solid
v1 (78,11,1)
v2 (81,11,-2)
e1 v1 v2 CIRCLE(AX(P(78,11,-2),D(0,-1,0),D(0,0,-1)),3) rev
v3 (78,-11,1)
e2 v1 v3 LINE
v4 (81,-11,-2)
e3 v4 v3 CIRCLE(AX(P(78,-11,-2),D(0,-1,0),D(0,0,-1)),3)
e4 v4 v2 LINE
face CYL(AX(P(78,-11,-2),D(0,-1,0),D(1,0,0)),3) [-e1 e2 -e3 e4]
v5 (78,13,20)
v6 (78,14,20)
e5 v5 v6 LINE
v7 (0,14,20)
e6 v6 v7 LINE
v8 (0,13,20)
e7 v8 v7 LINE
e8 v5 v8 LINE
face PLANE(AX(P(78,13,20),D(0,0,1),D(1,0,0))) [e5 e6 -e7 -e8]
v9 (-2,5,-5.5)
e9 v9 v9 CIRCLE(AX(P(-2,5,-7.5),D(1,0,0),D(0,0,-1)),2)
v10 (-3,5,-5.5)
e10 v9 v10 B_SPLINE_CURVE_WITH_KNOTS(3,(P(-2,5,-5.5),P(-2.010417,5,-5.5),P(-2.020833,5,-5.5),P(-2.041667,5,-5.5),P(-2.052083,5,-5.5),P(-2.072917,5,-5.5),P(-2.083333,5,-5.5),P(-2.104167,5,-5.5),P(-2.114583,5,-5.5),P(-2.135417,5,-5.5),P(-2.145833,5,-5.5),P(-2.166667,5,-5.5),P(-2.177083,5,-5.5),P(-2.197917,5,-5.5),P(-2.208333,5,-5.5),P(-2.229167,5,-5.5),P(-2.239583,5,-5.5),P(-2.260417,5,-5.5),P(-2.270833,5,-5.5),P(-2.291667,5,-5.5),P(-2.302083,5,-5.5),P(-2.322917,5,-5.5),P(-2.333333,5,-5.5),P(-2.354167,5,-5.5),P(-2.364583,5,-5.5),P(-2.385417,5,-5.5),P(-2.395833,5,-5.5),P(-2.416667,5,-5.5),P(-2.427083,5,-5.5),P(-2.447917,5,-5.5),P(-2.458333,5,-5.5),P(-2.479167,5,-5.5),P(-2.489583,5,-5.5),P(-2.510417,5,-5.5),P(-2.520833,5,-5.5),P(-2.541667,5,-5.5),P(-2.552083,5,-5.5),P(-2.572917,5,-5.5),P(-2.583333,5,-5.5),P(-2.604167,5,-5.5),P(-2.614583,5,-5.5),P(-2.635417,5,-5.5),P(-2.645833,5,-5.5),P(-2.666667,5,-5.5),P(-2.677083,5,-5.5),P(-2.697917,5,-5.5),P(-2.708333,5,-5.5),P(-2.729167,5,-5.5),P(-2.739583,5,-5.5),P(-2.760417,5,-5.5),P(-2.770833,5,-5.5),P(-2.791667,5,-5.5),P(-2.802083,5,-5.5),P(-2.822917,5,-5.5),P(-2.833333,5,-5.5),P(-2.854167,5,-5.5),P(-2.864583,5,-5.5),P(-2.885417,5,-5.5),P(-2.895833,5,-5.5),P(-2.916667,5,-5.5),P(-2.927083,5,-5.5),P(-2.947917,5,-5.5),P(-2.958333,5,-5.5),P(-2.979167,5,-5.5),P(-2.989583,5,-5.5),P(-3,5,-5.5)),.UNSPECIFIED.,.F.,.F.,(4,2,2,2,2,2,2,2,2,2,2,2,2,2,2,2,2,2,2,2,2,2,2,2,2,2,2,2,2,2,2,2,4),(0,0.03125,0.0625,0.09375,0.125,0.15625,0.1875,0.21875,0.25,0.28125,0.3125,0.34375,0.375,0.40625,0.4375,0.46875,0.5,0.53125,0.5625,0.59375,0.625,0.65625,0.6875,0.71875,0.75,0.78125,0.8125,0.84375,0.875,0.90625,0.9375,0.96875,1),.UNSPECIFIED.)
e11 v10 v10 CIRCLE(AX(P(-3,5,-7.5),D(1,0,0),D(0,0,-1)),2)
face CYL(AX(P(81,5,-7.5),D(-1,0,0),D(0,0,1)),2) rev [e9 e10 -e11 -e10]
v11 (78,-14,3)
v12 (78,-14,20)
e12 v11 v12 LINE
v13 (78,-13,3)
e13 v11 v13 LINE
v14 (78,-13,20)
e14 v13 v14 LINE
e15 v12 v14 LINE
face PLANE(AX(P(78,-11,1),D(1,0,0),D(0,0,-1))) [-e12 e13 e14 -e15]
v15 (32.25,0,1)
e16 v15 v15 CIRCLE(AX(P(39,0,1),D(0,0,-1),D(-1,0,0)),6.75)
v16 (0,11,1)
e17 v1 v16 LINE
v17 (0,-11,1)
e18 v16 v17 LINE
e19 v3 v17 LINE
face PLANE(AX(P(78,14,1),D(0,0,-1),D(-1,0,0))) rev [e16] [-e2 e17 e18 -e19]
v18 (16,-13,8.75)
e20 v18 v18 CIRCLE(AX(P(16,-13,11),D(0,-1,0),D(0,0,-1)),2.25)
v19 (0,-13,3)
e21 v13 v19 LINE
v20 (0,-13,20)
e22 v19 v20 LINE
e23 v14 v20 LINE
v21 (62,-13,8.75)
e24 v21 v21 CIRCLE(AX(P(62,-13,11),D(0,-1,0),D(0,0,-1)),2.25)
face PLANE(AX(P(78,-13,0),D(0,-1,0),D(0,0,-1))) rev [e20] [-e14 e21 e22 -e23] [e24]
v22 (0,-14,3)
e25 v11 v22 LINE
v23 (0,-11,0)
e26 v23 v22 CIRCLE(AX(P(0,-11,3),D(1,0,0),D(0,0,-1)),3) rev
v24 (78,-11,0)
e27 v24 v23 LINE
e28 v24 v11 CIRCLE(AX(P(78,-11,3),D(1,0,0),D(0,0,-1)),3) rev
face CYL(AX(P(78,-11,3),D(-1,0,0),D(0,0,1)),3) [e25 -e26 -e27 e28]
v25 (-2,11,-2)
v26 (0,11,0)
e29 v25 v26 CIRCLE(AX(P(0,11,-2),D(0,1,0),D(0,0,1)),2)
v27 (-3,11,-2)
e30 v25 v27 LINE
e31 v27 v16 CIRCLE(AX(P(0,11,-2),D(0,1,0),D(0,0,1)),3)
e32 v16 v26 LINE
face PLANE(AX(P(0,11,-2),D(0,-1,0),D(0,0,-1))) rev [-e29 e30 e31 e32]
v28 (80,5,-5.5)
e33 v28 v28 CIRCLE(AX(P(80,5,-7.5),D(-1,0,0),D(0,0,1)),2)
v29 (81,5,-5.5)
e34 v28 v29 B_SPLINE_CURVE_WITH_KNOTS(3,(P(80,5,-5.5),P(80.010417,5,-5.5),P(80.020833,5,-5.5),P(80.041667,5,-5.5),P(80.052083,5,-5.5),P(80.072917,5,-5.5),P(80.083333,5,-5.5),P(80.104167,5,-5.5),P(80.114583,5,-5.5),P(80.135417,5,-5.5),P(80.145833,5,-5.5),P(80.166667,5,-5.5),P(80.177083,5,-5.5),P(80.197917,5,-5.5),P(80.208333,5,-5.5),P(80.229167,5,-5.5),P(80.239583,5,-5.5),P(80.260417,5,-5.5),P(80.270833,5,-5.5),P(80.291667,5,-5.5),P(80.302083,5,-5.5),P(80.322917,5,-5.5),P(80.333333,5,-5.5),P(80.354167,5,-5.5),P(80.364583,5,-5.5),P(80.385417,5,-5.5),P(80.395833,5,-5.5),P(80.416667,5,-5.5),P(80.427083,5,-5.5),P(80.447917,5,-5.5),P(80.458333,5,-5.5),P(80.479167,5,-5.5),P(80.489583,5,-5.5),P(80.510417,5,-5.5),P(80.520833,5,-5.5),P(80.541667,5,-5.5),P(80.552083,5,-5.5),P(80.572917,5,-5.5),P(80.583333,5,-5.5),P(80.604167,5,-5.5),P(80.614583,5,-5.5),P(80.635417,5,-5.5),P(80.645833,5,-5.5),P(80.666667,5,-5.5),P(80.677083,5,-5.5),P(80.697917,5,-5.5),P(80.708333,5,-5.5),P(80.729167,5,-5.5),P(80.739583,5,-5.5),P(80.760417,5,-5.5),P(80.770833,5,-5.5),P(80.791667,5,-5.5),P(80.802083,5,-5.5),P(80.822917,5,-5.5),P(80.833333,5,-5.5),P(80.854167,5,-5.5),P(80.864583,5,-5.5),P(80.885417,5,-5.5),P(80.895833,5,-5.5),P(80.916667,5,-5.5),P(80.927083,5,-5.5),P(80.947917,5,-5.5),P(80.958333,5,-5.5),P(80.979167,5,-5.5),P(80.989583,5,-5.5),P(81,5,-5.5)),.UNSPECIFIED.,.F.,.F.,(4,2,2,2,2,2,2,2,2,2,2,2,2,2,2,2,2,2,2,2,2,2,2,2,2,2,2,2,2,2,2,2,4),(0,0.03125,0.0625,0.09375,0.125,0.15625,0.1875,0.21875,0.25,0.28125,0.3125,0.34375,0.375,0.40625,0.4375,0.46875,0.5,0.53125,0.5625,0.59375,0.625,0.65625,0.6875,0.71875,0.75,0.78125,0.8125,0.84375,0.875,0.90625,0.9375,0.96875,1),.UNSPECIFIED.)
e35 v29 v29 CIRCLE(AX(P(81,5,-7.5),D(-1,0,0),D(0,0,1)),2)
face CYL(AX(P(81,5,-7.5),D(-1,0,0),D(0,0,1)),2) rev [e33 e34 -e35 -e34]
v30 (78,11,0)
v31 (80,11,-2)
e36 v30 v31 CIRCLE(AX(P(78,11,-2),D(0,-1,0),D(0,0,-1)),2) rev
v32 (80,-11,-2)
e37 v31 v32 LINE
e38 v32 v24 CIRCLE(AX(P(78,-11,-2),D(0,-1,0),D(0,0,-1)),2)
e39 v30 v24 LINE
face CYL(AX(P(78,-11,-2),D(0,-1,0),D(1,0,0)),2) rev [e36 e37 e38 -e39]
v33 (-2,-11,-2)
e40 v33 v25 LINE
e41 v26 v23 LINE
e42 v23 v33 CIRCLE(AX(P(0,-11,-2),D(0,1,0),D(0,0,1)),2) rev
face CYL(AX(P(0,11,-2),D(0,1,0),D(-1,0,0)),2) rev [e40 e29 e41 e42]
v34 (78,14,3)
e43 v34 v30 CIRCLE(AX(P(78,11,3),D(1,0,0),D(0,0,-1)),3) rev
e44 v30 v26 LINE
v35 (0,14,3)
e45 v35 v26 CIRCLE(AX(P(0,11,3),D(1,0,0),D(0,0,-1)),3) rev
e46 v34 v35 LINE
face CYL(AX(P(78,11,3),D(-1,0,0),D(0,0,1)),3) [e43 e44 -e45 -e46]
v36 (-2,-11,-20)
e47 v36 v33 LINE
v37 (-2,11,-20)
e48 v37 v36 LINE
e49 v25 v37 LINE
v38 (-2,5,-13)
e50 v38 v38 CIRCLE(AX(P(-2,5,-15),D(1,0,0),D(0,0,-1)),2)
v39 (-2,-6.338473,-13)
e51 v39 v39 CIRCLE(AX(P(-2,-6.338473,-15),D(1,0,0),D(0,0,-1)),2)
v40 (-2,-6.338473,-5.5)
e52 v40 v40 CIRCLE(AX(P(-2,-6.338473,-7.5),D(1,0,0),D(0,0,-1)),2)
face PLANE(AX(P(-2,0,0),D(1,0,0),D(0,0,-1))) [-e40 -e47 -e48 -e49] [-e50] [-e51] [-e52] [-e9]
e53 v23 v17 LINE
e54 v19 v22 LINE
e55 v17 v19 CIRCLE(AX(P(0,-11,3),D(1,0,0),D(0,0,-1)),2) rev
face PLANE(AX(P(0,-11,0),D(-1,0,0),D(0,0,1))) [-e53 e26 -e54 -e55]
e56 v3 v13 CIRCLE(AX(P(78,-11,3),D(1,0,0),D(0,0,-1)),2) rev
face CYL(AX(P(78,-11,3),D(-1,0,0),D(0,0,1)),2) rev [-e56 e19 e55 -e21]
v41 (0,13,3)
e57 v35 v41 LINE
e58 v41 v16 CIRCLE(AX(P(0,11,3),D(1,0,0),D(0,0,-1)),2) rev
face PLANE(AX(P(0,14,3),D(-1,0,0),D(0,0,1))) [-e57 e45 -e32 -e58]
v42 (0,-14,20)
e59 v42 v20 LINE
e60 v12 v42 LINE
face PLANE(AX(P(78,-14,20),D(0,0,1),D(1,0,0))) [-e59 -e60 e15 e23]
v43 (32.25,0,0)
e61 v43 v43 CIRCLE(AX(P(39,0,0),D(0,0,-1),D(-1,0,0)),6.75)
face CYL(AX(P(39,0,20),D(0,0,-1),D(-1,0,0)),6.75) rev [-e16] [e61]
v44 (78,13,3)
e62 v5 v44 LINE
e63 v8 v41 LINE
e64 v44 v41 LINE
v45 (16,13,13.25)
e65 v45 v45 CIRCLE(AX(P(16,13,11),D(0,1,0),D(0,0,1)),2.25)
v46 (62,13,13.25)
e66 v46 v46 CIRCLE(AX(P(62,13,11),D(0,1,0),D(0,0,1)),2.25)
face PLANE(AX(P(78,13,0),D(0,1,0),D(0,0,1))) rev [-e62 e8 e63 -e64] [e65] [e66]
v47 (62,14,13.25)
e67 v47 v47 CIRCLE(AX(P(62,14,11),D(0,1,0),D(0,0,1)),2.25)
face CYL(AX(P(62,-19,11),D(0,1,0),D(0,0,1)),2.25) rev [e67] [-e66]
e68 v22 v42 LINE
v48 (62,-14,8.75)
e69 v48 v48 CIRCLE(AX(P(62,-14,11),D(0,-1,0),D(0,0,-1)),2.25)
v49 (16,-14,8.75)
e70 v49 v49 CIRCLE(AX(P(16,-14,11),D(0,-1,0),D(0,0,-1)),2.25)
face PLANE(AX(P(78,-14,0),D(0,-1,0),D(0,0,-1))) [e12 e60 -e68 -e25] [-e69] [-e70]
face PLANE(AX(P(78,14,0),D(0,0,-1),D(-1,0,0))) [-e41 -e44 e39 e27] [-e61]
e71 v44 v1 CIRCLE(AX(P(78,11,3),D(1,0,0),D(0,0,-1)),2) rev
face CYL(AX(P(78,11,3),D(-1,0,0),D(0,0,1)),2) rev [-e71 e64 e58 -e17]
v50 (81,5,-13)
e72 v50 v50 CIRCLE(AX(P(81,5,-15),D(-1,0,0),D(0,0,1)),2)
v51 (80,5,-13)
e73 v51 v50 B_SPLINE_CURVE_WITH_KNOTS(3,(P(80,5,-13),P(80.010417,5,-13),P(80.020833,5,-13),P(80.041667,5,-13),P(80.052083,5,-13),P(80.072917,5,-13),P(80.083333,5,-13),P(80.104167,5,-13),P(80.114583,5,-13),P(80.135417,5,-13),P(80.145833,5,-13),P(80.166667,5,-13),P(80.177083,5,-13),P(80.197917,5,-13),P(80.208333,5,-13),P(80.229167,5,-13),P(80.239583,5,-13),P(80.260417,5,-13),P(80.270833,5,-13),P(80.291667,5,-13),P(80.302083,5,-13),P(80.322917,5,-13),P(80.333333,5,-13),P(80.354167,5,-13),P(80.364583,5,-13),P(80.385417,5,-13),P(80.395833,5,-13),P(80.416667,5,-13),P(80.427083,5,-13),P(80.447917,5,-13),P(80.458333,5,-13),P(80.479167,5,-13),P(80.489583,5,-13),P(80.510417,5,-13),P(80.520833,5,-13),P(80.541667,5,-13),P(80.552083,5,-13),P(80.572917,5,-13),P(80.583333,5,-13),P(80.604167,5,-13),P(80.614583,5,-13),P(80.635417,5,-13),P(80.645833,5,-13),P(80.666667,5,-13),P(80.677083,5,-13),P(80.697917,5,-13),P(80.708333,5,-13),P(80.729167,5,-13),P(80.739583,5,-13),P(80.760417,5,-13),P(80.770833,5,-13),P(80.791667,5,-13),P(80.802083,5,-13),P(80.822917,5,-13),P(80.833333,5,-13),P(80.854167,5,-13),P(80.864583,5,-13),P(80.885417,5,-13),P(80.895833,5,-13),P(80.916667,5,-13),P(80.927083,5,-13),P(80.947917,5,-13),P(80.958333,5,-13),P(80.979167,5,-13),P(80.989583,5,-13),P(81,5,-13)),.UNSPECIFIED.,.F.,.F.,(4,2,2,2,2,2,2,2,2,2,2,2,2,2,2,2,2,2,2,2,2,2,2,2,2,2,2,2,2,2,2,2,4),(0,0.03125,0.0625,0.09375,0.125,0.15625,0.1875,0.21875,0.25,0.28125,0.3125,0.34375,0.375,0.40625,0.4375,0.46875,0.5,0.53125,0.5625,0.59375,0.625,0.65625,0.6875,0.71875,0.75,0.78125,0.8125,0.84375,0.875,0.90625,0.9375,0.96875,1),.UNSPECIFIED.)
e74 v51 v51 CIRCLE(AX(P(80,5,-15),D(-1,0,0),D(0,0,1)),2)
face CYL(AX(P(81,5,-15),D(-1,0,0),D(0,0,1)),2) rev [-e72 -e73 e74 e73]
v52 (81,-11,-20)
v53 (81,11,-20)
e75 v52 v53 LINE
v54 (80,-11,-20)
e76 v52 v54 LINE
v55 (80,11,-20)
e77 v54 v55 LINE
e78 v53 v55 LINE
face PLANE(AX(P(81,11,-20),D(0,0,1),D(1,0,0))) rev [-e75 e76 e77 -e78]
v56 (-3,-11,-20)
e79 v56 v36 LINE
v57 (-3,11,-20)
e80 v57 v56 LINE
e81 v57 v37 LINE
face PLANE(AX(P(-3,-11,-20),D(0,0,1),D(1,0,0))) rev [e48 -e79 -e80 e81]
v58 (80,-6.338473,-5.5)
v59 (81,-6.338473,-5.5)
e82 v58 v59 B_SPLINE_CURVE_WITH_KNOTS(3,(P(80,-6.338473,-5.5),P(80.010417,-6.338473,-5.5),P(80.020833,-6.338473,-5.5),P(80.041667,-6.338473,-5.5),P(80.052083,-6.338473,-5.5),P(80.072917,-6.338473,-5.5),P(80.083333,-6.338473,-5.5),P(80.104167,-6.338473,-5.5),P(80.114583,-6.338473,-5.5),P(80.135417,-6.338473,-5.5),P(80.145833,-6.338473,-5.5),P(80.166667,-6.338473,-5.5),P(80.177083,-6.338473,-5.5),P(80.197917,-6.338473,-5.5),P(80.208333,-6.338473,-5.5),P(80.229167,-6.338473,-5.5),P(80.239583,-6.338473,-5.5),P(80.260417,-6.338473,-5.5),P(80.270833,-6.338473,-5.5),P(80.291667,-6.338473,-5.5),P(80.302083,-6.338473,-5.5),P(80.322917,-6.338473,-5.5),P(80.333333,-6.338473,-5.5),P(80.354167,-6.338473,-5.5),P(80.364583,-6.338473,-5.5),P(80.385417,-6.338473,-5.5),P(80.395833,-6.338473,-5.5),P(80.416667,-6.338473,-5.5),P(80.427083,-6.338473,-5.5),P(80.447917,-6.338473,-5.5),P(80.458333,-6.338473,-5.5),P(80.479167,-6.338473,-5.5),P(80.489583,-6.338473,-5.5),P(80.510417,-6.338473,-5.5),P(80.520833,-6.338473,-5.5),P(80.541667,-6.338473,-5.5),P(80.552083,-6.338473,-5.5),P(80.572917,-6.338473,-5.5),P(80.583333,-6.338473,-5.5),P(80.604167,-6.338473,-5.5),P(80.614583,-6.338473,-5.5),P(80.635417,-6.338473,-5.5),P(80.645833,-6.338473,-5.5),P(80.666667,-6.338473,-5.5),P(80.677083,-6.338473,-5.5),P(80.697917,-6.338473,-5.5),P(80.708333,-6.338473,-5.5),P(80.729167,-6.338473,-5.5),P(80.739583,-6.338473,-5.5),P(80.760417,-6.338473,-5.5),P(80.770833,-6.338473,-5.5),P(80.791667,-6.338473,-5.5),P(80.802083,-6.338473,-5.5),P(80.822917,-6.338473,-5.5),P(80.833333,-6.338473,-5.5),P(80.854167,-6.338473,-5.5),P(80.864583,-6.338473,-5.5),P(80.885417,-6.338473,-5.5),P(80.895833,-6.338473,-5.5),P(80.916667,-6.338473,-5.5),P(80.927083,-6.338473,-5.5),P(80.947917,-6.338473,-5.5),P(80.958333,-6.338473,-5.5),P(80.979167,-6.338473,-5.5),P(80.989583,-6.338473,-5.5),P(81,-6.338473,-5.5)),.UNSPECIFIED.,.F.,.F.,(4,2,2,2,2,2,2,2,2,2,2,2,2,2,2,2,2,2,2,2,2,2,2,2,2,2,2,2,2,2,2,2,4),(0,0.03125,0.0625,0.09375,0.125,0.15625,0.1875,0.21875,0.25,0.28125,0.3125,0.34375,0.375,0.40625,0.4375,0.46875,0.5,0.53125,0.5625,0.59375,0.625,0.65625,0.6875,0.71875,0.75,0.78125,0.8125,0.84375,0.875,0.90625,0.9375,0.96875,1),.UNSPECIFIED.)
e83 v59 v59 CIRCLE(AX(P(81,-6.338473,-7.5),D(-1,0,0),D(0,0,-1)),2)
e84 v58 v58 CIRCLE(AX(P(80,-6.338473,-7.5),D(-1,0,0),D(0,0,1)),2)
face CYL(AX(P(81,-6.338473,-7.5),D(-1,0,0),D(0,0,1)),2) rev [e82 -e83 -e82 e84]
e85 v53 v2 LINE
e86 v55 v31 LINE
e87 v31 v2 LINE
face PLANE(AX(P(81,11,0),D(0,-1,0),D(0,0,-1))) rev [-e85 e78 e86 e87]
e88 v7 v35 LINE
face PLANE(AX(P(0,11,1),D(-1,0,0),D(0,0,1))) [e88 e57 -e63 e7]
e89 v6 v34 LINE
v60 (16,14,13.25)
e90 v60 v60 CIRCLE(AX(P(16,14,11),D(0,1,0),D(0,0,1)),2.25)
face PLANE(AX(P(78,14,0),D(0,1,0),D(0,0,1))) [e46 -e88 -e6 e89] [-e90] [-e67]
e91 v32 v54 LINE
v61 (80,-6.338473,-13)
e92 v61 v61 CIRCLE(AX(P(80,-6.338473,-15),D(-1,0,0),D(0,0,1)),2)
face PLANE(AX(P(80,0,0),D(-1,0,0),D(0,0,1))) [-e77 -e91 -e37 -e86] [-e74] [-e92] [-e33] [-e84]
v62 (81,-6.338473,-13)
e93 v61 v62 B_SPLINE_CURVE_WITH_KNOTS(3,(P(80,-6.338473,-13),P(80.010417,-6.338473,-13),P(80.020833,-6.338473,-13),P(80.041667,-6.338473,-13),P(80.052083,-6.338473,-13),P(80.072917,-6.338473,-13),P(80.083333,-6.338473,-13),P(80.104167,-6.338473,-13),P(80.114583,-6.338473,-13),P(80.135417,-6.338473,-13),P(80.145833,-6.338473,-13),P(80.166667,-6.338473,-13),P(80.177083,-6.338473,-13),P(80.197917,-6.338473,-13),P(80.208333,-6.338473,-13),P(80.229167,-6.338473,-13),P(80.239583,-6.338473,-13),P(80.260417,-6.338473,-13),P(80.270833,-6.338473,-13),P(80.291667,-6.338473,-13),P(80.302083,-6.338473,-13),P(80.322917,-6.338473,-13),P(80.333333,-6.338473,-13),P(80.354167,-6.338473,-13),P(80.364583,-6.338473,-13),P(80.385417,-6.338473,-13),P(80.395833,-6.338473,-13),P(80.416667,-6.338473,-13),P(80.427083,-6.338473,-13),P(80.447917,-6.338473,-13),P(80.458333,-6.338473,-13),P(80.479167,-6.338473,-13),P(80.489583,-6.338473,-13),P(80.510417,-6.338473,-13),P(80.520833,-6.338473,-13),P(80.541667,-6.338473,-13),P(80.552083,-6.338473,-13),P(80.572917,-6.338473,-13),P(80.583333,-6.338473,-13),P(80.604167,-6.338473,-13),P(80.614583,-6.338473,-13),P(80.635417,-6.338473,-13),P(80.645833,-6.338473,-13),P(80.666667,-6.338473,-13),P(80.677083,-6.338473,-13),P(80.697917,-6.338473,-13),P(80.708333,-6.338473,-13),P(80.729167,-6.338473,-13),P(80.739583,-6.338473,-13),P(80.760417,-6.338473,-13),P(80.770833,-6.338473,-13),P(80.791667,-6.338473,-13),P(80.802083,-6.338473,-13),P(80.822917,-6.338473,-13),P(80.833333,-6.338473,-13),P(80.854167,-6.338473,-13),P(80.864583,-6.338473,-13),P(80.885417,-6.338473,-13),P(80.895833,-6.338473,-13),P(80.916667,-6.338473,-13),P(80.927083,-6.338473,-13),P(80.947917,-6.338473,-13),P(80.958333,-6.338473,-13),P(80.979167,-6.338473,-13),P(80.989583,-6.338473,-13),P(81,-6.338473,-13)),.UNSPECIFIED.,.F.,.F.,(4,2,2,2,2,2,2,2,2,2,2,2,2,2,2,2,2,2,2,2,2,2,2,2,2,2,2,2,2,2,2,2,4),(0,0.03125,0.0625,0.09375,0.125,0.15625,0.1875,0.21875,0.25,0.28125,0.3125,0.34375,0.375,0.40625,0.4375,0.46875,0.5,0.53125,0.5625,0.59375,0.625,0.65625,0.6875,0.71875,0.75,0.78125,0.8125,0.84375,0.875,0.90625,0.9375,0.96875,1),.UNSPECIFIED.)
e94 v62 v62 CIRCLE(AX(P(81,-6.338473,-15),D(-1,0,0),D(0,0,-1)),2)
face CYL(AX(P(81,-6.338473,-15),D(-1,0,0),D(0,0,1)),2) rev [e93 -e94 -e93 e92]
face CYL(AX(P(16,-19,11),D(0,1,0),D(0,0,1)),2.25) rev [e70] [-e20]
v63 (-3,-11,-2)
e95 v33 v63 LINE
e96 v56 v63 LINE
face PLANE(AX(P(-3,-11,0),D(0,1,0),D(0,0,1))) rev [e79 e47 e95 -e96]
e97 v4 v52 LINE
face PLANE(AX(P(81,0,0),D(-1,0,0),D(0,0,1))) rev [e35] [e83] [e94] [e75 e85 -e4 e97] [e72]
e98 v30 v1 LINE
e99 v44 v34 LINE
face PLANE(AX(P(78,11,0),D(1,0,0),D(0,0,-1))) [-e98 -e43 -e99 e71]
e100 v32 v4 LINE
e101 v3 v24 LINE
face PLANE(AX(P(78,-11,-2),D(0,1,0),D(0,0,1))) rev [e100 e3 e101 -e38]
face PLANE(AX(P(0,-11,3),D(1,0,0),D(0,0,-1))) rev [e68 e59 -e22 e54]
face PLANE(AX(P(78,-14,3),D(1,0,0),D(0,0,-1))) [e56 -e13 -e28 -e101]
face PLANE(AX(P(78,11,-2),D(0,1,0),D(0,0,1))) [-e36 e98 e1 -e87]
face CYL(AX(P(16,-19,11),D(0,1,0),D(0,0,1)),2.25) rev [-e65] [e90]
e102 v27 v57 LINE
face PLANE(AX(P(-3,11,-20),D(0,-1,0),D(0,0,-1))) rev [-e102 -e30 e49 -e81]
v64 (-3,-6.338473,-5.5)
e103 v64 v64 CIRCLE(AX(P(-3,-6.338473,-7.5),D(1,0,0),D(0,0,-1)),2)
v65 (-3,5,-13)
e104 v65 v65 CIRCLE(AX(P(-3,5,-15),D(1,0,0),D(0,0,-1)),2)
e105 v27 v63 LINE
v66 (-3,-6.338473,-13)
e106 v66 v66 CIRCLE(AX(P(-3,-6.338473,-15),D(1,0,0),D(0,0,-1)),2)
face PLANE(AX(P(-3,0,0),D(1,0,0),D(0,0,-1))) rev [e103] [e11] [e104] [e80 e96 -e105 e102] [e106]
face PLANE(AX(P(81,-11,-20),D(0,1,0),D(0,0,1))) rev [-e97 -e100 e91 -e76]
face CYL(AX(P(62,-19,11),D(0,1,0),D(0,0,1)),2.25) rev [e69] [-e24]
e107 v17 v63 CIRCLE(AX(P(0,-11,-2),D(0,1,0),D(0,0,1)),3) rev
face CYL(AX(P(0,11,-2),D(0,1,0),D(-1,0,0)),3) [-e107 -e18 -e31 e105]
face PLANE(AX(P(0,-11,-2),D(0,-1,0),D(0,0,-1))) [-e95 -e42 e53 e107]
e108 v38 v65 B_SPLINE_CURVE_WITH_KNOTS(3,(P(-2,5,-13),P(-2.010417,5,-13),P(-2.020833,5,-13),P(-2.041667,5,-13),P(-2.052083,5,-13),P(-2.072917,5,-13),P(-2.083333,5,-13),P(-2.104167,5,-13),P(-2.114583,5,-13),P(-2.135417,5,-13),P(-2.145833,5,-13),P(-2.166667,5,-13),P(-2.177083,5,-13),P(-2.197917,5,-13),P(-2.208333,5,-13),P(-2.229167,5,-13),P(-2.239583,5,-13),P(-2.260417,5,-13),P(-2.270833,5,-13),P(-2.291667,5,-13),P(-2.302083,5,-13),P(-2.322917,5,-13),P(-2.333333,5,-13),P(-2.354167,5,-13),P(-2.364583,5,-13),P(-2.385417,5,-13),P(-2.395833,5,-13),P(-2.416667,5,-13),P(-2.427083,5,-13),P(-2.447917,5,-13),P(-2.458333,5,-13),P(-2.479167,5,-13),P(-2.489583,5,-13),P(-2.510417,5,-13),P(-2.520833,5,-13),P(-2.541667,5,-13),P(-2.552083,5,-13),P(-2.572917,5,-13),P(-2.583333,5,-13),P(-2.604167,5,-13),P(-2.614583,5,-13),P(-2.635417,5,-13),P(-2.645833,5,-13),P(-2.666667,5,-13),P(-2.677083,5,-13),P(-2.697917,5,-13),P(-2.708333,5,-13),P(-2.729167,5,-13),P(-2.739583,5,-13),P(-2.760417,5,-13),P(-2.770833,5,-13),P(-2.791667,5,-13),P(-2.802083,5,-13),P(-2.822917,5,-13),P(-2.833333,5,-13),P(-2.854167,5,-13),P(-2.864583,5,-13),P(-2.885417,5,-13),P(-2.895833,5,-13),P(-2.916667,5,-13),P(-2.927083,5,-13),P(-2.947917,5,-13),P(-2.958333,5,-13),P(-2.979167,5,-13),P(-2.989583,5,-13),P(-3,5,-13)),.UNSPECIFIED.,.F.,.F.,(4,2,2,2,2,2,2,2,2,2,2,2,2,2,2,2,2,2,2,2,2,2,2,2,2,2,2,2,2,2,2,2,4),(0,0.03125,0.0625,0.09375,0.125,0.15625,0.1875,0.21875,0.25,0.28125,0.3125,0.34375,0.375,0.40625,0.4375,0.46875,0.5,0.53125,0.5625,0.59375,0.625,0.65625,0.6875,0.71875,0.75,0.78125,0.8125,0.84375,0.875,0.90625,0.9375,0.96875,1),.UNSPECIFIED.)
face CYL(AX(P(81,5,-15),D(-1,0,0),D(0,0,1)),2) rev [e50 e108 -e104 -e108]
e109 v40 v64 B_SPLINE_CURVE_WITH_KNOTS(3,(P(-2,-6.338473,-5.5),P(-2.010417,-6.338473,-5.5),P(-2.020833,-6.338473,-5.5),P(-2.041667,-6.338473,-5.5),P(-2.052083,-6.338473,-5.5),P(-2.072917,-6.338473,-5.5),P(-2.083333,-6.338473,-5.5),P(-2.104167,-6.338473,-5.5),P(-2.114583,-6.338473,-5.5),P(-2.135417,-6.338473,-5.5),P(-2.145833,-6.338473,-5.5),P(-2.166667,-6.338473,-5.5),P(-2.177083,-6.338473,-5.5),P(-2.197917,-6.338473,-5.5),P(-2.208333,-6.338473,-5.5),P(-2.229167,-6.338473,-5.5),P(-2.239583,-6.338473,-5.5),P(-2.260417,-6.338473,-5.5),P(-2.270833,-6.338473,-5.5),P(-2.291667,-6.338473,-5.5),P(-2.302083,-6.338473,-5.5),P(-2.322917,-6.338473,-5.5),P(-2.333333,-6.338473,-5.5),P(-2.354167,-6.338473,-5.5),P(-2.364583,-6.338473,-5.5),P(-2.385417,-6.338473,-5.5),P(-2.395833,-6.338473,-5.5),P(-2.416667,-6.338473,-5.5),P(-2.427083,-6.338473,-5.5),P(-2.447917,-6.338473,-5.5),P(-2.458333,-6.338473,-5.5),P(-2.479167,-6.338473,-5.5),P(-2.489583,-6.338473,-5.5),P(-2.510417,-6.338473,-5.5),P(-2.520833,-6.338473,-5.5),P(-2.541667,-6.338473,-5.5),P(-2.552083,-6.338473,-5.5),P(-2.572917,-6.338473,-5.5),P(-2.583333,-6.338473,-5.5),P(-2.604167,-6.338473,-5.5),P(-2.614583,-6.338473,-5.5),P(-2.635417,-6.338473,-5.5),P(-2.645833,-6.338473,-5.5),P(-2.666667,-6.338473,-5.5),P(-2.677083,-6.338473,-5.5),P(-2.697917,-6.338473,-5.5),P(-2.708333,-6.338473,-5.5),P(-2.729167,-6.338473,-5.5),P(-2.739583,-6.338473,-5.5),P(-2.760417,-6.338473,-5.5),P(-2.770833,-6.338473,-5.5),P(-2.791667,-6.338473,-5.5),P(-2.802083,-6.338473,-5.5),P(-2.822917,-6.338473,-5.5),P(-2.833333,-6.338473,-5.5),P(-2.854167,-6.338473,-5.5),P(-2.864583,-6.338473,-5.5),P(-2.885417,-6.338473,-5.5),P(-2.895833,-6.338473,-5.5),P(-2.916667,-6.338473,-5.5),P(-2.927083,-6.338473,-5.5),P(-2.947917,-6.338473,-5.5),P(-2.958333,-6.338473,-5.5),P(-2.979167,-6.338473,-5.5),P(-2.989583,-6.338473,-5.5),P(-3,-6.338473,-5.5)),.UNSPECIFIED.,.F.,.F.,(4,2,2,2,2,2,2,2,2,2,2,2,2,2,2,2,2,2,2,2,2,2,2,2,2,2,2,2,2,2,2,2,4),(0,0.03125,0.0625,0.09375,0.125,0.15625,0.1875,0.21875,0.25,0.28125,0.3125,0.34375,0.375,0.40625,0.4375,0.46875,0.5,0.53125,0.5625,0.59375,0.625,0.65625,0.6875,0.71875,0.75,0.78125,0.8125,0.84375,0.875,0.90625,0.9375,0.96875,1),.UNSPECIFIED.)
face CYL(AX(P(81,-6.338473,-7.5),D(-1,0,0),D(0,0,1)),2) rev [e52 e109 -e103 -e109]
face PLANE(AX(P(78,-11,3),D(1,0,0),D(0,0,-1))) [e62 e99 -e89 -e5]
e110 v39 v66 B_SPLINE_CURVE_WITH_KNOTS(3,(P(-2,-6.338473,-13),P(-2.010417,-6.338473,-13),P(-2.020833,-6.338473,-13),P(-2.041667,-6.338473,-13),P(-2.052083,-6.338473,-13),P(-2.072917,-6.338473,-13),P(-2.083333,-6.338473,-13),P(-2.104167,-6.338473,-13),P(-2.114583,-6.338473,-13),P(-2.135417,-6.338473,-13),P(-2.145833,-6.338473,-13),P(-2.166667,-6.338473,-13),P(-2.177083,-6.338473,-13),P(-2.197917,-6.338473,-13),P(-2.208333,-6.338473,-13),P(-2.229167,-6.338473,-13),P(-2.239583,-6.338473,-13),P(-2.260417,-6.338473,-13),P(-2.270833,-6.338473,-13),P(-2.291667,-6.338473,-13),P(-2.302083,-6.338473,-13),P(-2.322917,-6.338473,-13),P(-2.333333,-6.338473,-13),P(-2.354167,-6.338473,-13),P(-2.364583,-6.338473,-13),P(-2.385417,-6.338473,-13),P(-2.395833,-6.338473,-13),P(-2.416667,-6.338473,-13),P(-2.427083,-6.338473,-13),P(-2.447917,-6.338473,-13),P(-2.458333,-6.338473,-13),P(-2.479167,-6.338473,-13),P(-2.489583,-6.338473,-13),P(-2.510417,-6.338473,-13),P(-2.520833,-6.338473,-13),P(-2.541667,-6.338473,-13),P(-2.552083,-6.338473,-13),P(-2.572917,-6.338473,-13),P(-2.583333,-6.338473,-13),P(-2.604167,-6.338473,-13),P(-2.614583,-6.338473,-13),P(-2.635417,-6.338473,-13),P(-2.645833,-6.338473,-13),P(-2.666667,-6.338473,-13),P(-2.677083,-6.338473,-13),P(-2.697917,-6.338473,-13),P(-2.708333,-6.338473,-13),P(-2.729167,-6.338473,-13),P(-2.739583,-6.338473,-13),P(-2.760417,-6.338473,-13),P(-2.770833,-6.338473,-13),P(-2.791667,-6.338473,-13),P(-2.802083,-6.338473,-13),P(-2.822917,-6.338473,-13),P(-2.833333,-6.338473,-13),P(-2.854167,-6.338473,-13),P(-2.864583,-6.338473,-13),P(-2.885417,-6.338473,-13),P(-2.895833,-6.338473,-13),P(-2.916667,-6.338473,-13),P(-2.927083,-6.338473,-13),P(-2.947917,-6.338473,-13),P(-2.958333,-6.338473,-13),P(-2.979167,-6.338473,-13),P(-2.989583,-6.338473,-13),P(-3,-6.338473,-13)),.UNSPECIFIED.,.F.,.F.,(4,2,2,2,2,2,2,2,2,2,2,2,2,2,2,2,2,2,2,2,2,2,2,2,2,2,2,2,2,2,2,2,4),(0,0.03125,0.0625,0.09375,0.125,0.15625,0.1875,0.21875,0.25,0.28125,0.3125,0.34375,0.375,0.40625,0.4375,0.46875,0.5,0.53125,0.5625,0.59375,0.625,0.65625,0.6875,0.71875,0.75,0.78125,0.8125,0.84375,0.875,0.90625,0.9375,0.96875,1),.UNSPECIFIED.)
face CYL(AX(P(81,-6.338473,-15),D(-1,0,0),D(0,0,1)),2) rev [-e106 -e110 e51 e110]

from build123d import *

# Parameters (mm, degrees)
BASE_FLANGE1_DEPTH      = 78
EDGE_FLANGE1_DEPTH      = 22
EDGE_FLANGE1_BEND_DEPTH = 22
SKETCH14_R              = 2.25
CUT_EXTRUDE1_DEPTH      = 33
SKETCH15_R              = 6.75
CUT_EXTRUDE2_DEPTH      = 85.599054368
CUT_EXTRUDE3_DEPTH      = 88.475710915
CUT_EXTRUDE3_DEPTH_BACK = 88.475710915
SKETCH16_R              = 2


# Sheet-metal steps are written as plain solids
with BuildPart() as part:
    # Sketch3 → Base-Flange1 (new body)
    with BuildSketch(Plane(origin=(0, 0, 0), x_dir=(0, 0, -1), z_dir=(1, 0, 0))):
        with BuildLine():
            Line((-20, 14), (-3, 14))
            ThreePointArc((-3, 14), (-0.878679656, 13.121320344), (0, 11))
            Line((0, 11), (0, -11))
            ThreePointArc((0, -11), (-0.878679656, -13.121320344), (-3, -14))
            Line((-3, -14), (-20, -14))
            Line((-20, -14), (-20, -13))
            Line((-20, -13), (-3, -13))
            ThreePointArc((-3, -13), (-1.585786438, -12.414213562), (-1, -11))
            Line((-1, -11), (-1, 11))
            ThreePointArc((-1, 11), (-1.585786438, 12.414213562), (-3, 13))
            Line((-3, 13), (-20, 13))
            Line((-20, 13), (-20, 14))
        make_face()
    extrude(amount=BASE_FLANGE1_DEPTH)

    # Edge-Flange1 section (across the edge) → Edge-Flange1 (add)
    with BuildSketch(Plane(origin=(80, 11, 0), x_dir=(-1, 0, 0), z_dir=(0, -1, 0))):
        with BuildLine():
            Line((-1, 2), (-1, 20))
            Line((-1, 20), (0, 20))
            Line((0, 20), (0, 2))
            ThreePointArc((0, 2), (0.585786438, 0.585786438), (2, 0))
            Line((2, 0), (2, -1))
            ThreePointArc((2, -1), (-0.121320344, -0.121320344), (-1, 2))
        make_face()
    extrude(amount=EDGE_FLANGE1_DEPTH)

    # Edge-Flange1 section 2 (across the edge) → Edge-Flange1 bend (add)
    with BuildSketch(Plane(origin=(-2, -11, 0), x_dir=(1, 0, 0), z_dir=(0, 1, 0))):
        with BuildLine():
            Line((-1, 2), (-1, 20))
            Line((-1, 20), (0, 20))
            Line((0, 20), (0, 2))
            ThreePointArc((0, 2), (0.585786438, 0.585786438), (2, 0))
            Line((2, 0), (2, -1))
            ThreePointArc((2, -1), (-0.121320344, -0.121320344), (-1, 2))
        make_face()
    extrude(amount=EDGE_FLANGE1_BEND_DEPTH)

    # Sketch14 → Cut-Extrude1 (cut)
    with BuildSketch(Plane(origin=(0, 14, 0), x_dir=(1, 0, 0), z_dir=(0, 1, 0))):
        with Locations(Location((16, -11, 0), (0, 0, 270))):
            Circle(SKETCH14_R)
        with Locations(Location((62, -11, 0), (0, 0, 270))):
            Circle(SKETCH14_R)
    extrude(amount=-CUT_EXTRUDE1_DEPTH, mode=Mode.SUBTRACT)

    # Sketch15 → Cut-Extrude2 (cut, through all)
    with BuildSketch(Plane(origin=(0, 0, 0), x_dir=(-1, 0, 0), z_dir=(0, 0, -1))):
        with Locations((-39, 0)):
            Circle(SKETCH15_R)
    extrude(amount=-CUT_EXTRUDE2_DEPTH, mode=Mode.SUBTRACT)

    # Sketch16 → Cut-Extrude3 (cut, two sides: drawn at the far end of the back side and taken through both)
    with BuildSketch(Plane.ZY.offset(3).offset(-CUT_EXTRUDE3_DEPTH_BACK)):
        with Locations((-15, 5)):
            Circle(SKETCH16_R)
        with Locations((-7.5, 5)):
            Circle(SKETCH16_R)
        with Locations((-7.5, -6.338473389)):
            Circle(SKETCH16_R)
        with Locations((-15, -6.338473389)):
            Circle(SKETCH16_R)
    extrude(amount=CUT_EXTRUDE3_DEPTH + CUT_EXTRUDE3_DEPTH_BACK, mode=Mode.SUBTRACT)


solid = part.part
